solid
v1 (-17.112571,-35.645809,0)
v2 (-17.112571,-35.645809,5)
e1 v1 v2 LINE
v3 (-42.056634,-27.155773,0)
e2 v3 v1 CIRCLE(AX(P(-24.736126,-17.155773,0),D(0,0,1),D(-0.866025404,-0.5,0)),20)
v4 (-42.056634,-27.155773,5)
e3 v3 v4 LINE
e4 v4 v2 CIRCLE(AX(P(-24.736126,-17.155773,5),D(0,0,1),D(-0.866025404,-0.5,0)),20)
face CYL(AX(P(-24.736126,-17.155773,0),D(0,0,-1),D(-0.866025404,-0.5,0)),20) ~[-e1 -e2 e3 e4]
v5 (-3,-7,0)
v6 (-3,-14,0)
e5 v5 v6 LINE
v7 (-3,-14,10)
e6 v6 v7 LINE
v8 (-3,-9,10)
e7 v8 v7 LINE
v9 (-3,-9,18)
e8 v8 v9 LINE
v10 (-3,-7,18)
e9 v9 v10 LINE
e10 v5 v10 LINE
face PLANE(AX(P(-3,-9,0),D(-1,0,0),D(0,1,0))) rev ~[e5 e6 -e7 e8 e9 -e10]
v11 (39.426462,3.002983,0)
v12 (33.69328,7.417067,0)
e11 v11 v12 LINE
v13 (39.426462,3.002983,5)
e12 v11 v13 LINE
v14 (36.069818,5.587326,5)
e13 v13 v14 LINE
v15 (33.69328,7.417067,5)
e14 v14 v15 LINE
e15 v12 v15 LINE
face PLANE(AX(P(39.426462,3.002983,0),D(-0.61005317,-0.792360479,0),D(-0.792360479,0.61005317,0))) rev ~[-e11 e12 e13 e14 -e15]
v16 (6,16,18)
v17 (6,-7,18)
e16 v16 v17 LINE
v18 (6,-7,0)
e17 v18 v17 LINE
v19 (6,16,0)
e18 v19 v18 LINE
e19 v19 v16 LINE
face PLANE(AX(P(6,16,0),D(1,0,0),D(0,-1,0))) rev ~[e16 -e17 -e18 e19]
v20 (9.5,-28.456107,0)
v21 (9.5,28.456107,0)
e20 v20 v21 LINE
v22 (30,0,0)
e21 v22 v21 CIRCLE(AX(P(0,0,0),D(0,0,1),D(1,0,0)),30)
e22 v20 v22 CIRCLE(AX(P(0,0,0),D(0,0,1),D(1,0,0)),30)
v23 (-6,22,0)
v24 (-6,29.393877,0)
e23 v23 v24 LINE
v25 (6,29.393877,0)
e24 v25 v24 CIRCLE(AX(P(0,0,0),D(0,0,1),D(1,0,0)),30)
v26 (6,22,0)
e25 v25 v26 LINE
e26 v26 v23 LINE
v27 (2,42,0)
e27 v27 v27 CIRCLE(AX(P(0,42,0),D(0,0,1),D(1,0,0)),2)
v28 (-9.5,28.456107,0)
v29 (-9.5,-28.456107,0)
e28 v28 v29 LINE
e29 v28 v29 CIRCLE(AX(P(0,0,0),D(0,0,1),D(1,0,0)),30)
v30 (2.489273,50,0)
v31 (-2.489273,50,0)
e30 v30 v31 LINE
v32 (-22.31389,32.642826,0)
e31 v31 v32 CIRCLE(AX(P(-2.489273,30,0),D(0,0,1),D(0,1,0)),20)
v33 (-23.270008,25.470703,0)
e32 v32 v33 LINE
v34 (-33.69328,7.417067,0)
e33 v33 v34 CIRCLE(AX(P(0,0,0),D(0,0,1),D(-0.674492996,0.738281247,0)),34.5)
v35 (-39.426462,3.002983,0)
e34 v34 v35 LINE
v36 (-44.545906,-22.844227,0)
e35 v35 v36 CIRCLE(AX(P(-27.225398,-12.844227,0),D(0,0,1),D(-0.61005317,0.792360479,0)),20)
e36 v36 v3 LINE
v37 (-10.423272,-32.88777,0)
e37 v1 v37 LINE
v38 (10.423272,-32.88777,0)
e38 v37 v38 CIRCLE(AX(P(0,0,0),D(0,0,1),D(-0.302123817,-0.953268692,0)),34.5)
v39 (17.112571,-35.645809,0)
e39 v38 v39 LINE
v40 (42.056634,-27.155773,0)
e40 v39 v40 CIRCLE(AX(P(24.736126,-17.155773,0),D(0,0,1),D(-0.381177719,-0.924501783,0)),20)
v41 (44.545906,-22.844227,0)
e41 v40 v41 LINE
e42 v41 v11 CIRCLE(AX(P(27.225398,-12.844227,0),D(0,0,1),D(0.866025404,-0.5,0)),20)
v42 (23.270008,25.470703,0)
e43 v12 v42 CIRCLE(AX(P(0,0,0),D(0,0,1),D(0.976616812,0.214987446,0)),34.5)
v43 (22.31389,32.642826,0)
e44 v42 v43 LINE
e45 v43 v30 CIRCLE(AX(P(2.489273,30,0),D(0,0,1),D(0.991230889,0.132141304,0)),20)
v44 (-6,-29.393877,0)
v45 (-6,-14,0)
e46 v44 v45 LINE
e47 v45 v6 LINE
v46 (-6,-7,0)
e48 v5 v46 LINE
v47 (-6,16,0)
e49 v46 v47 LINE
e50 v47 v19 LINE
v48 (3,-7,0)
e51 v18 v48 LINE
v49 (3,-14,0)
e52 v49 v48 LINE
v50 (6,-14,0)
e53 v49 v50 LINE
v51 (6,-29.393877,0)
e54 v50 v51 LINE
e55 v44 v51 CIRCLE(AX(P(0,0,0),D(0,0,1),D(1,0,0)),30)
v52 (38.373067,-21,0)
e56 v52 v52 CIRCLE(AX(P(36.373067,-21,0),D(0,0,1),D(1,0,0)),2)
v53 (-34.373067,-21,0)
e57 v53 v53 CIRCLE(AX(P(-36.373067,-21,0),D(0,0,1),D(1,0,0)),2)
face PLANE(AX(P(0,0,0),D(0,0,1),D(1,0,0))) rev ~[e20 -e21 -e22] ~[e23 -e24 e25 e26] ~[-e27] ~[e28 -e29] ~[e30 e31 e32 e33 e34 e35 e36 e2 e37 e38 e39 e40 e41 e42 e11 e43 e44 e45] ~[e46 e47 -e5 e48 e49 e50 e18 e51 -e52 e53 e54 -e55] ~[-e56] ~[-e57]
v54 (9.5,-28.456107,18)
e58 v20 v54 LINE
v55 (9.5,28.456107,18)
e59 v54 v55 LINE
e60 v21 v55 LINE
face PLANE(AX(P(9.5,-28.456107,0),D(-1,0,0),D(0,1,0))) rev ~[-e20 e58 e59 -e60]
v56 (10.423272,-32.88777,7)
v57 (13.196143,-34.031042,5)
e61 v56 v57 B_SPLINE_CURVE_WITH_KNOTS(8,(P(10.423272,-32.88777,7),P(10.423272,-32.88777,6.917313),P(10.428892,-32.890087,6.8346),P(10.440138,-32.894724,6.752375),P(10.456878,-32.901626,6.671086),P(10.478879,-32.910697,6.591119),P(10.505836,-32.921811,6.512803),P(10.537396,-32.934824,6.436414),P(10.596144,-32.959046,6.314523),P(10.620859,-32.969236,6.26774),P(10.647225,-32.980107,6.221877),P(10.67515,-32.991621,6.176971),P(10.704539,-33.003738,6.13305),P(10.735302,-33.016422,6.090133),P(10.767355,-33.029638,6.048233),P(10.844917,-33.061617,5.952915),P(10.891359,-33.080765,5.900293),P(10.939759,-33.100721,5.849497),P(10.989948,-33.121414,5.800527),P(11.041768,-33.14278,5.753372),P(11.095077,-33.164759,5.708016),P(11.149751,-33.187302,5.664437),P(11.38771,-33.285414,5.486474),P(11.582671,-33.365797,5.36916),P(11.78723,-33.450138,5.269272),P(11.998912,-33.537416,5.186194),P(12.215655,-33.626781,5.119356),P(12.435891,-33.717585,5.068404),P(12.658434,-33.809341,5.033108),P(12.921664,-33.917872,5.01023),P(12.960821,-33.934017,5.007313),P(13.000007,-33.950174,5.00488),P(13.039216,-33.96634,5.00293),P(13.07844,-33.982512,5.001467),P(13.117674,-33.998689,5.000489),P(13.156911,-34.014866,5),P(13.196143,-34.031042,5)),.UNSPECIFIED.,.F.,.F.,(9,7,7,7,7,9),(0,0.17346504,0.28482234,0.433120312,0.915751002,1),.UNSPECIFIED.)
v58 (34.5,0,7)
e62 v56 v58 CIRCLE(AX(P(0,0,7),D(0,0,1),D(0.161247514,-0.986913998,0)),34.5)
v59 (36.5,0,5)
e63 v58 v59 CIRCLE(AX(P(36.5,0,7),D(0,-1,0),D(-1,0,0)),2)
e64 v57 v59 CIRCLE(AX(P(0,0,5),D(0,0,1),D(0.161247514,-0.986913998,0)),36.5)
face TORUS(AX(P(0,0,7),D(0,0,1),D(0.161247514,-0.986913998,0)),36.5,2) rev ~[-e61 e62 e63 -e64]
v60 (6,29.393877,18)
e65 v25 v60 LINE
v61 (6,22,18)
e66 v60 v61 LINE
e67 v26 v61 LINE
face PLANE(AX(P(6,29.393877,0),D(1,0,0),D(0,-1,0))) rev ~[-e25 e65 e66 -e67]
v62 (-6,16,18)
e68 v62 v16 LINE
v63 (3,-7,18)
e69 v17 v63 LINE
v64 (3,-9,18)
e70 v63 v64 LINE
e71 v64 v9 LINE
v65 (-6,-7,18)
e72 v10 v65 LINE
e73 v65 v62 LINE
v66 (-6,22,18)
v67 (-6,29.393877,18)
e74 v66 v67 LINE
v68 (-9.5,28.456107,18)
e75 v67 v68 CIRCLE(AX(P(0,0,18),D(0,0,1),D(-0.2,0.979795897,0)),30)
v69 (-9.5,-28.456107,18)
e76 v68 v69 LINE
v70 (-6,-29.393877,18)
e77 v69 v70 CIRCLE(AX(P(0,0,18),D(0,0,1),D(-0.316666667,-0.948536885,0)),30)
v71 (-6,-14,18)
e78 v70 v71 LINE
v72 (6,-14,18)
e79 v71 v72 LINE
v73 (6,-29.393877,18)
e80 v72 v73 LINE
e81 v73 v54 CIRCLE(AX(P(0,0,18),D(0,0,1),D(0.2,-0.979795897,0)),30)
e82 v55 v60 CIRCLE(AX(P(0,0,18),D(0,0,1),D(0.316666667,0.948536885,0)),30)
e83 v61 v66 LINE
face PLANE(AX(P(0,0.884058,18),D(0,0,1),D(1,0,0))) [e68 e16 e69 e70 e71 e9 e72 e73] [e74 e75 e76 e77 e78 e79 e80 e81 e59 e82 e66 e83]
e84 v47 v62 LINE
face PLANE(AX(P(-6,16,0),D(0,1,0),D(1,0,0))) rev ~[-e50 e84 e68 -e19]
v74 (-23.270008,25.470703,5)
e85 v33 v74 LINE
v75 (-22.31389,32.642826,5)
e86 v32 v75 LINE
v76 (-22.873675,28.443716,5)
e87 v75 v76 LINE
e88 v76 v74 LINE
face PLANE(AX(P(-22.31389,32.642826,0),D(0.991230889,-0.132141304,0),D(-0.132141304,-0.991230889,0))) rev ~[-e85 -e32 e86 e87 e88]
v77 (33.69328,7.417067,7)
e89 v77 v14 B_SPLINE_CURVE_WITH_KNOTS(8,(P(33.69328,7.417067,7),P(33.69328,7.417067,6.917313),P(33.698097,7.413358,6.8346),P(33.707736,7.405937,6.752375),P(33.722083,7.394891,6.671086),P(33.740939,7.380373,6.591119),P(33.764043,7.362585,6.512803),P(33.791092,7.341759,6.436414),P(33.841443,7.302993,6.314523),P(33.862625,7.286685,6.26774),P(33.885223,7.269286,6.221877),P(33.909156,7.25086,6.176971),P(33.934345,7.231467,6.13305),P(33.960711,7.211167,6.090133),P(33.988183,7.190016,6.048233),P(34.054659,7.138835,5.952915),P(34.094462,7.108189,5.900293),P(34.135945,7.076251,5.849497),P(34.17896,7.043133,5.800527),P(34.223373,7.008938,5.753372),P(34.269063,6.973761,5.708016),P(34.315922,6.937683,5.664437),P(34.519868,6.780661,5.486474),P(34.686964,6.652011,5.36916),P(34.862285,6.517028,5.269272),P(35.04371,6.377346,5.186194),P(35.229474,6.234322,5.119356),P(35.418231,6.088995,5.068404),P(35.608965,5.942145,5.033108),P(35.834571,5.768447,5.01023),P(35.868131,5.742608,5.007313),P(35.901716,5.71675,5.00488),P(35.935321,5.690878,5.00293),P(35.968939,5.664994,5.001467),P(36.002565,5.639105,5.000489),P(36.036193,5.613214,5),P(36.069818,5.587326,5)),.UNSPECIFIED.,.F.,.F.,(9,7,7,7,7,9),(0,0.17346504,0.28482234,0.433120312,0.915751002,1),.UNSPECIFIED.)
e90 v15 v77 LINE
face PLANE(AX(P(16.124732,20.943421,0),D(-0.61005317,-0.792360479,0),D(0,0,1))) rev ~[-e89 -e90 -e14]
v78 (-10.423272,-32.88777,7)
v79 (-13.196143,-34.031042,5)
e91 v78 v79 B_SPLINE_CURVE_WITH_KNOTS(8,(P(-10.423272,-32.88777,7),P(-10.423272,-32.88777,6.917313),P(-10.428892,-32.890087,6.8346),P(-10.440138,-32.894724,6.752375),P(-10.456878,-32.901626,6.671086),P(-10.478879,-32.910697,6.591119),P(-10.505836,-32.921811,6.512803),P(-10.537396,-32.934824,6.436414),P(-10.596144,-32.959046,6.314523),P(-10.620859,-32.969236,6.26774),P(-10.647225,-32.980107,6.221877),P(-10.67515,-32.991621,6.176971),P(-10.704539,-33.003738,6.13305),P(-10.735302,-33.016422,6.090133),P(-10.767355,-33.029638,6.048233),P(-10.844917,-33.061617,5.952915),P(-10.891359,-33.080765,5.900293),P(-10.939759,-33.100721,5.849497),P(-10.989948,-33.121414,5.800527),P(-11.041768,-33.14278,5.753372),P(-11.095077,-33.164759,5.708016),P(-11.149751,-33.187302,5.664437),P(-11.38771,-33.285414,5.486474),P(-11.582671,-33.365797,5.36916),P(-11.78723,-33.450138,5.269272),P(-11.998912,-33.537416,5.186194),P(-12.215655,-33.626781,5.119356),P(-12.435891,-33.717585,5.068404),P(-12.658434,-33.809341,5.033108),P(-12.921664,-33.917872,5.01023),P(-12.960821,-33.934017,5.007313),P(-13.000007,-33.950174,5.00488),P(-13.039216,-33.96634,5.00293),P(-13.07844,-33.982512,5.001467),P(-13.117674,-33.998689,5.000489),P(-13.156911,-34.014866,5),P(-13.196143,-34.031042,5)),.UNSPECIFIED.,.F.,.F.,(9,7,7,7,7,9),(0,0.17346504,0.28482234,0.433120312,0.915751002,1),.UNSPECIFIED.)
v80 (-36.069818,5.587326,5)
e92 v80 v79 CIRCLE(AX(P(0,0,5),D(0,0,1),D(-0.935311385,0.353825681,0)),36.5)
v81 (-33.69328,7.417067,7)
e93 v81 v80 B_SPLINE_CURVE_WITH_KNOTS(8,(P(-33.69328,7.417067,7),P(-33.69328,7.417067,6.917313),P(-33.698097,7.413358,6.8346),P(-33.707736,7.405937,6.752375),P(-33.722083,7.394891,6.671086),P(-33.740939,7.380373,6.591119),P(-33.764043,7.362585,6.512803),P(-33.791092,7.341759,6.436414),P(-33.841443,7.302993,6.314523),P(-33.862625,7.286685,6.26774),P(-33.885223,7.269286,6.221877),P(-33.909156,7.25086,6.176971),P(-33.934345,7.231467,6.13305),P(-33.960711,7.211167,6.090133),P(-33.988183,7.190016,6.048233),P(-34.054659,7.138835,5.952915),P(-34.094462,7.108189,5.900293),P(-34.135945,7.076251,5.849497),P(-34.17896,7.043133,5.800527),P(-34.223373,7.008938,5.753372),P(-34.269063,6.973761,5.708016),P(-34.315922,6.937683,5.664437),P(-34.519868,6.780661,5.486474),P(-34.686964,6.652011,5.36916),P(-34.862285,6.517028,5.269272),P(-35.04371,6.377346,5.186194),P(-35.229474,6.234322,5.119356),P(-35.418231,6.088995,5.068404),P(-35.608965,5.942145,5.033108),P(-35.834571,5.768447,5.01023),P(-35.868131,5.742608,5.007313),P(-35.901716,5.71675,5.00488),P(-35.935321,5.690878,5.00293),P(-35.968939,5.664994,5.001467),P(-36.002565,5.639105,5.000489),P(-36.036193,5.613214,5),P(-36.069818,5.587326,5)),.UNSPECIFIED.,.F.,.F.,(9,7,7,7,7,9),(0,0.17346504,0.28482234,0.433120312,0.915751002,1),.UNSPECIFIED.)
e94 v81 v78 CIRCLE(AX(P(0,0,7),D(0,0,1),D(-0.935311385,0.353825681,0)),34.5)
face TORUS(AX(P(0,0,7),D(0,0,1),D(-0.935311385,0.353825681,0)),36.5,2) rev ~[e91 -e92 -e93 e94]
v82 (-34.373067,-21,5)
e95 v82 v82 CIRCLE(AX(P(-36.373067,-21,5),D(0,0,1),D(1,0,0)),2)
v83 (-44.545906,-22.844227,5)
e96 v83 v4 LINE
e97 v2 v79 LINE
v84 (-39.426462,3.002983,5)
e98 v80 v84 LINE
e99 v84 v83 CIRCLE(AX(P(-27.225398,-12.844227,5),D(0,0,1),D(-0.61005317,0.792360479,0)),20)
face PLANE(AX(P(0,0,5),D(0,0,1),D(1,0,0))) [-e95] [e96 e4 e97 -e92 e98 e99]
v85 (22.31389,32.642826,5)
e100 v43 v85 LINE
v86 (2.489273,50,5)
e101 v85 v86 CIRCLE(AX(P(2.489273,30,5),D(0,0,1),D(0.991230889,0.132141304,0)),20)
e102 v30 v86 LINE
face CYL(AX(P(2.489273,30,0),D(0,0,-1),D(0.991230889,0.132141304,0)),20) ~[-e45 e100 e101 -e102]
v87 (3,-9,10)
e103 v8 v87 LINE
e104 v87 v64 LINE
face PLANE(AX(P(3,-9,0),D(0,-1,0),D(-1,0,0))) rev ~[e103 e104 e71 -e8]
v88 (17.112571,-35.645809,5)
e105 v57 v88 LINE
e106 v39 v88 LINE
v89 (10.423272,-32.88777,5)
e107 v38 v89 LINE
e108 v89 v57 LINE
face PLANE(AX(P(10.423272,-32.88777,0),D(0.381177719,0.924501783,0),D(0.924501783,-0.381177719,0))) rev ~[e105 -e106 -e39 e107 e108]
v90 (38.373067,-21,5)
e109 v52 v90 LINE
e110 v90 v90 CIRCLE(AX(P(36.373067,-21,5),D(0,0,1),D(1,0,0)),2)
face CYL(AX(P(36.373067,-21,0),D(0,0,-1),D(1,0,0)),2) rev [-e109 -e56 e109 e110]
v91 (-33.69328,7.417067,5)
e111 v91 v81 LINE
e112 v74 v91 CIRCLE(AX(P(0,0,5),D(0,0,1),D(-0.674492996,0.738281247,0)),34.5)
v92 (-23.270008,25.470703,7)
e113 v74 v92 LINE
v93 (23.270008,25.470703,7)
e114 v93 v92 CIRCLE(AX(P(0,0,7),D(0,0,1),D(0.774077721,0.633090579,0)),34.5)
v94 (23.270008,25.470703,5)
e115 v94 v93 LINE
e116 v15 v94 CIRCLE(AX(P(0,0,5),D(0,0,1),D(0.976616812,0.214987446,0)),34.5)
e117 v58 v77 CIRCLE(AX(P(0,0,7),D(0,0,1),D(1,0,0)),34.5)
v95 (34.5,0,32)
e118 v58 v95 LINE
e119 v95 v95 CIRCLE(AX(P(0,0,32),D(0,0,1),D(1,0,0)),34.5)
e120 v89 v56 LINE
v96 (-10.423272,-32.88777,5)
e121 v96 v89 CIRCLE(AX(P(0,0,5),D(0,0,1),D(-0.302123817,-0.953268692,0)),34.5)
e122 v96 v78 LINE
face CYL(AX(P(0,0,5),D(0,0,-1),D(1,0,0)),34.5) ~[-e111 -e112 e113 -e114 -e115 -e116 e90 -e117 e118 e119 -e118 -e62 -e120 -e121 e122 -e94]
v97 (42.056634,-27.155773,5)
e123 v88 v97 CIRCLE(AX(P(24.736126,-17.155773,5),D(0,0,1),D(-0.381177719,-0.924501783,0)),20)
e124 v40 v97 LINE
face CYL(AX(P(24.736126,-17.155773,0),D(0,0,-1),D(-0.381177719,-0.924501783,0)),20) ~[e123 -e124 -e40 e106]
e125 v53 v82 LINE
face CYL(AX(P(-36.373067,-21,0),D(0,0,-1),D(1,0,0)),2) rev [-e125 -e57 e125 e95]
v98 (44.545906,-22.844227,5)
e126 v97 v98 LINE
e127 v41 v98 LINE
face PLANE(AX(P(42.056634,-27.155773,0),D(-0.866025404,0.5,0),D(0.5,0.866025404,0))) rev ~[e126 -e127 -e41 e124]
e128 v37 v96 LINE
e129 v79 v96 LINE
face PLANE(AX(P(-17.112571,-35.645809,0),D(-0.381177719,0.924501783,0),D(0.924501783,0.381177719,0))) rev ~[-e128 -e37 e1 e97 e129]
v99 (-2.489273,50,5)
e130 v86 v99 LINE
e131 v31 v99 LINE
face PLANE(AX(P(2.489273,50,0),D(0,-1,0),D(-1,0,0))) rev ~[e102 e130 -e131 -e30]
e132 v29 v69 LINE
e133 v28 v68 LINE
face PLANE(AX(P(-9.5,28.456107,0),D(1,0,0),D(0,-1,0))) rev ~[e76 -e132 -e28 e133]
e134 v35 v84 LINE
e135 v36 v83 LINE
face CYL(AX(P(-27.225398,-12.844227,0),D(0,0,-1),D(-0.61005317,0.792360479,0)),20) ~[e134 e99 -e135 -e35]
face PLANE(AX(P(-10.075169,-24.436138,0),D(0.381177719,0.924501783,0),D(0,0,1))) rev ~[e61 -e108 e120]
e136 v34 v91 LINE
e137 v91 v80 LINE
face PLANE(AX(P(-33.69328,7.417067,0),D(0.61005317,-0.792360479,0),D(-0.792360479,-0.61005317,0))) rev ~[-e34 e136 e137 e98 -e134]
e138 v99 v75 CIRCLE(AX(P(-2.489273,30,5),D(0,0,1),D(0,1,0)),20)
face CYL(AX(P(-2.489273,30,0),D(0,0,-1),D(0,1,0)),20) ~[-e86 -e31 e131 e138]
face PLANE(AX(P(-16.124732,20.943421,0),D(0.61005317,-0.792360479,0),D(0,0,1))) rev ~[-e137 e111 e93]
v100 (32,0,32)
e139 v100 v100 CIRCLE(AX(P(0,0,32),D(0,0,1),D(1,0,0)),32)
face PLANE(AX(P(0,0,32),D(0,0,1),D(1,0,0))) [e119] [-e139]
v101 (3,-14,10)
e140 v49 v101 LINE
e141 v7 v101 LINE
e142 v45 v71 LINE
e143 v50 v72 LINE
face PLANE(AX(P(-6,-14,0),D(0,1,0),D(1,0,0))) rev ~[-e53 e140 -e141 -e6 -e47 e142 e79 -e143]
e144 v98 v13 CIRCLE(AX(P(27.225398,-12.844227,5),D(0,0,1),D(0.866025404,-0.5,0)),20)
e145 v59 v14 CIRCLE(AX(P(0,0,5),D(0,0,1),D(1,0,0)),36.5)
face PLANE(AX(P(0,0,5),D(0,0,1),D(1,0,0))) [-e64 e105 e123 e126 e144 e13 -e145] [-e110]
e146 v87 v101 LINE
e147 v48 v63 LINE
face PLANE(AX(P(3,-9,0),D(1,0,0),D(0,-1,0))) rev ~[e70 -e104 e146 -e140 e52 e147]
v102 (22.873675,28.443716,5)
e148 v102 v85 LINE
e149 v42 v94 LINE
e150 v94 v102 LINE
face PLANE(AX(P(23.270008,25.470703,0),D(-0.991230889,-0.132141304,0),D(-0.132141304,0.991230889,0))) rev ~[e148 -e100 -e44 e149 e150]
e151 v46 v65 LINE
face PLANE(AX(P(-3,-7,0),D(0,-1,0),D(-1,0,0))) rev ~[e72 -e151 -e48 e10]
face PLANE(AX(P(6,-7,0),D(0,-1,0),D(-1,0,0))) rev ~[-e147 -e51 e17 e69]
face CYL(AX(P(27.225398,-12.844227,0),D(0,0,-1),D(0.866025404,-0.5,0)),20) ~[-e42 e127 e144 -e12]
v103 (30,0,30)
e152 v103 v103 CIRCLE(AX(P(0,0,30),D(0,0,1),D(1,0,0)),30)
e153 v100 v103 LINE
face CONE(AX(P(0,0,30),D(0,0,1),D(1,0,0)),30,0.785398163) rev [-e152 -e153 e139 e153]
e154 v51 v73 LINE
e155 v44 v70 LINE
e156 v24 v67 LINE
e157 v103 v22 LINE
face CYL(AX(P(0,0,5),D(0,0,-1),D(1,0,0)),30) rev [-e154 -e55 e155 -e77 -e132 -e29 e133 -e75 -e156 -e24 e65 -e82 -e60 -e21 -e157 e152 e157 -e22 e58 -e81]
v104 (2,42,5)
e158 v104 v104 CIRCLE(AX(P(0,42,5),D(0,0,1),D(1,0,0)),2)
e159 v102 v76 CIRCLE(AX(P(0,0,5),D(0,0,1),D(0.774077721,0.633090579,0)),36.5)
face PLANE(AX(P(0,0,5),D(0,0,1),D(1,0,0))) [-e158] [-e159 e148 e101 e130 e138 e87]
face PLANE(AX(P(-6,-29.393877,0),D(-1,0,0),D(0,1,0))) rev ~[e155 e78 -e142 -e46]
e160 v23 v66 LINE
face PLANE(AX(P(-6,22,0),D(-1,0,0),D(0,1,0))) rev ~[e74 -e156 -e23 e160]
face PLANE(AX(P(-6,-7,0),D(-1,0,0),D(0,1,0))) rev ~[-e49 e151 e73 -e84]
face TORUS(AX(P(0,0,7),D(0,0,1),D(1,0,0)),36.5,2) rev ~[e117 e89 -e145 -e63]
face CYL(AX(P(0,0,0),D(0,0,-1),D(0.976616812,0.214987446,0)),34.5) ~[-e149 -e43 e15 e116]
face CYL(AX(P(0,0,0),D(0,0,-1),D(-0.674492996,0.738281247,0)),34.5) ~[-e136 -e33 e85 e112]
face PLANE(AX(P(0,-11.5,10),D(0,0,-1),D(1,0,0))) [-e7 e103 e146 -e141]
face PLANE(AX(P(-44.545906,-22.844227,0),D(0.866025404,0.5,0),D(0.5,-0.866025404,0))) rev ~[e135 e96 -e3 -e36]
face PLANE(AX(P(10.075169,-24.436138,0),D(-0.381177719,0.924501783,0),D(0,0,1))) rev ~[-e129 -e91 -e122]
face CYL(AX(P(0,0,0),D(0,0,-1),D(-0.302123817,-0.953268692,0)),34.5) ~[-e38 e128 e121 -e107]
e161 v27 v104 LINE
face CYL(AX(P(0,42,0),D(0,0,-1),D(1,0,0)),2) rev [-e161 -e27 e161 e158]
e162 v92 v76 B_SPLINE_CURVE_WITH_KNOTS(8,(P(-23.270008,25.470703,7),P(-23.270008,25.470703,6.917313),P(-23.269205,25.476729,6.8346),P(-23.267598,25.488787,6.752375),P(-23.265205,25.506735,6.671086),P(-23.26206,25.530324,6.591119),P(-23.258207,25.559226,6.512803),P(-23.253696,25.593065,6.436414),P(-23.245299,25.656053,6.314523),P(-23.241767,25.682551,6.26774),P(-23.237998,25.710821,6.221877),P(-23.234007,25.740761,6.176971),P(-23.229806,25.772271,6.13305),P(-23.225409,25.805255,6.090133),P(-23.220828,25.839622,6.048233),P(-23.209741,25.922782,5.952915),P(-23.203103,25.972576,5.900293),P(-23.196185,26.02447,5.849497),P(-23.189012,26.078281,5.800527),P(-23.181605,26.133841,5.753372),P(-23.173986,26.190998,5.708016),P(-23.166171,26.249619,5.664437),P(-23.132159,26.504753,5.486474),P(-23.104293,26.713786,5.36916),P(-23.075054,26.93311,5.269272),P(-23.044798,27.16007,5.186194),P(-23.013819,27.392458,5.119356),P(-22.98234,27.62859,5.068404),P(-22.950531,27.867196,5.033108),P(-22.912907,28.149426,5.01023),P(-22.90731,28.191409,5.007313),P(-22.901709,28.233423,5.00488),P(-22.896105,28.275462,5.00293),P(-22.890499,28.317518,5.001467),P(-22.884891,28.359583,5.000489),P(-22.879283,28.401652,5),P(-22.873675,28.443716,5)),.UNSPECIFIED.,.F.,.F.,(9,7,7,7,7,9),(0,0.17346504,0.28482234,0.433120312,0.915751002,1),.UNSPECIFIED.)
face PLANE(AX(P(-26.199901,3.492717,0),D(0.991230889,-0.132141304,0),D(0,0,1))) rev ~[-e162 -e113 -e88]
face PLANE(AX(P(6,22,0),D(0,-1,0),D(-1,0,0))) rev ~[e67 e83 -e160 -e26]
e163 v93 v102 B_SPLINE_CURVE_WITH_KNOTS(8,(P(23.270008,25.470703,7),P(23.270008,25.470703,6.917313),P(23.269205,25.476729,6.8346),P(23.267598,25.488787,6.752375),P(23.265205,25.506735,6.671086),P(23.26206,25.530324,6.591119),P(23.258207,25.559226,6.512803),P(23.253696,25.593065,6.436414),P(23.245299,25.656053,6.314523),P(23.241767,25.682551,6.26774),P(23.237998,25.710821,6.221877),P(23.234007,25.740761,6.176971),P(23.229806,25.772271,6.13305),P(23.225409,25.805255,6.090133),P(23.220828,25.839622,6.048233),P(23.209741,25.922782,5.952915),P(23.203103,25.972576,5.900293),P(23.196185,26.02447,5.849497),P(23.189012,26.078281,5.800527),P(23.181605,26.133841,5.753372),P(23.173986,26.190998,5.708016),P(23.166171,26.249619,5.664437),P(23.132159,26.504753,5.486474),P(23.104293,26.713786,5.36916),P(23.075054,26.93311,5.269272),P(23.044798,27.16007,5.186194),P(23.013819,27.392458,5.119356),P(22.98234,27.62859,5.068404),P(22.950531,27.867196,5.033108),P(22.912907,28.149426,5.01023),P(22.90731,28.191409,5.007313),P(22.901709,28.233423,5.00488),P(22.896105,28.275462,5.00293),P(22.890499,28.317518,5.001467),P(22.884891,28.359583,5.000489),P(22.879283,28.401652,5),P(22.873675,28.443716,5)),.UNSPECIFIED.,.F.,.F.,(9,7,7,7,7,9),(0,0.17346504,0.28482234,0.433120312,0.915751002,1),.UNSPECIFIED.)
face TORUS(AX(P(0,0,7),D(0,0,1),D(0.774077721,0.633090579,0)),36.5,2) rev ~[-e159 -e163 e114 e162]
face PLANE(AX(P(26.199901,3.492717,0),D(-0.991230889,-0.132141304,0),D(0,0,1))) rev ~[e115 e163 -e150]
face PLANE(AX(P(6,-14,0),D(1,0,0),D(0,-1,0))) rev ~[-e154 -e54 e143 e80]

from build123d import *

# Parameters (mm, degrees)
F0_R         = 2
F0_R_2       = 30
F1_DEPTH     = 5
F2_R         = 34.5
F2_R_2       = 30
F3_DEPTH     = 27
F5_DEPTH     = 18
F6_SIZE      = 2
F7_T4_ANGLE  = 101.4429805126
F7_T10_ANGLE = 101.4429805126
F7_T16_ANGLE = 20.718590379
F7_T21_ANGLE = 80.7206862136
F8_W         = 6
F8_H         = 5
F9_DEPTH     = 10


# Not quite as in the source:
# - a fillet or chamfer that OpenCascade refuses, or shapes differently, is made with other operations: its cross-section is extruded or revolved along the edge and cut away or added


with BuildPart() as f1:
    # F0 (on Top) → F1 (new body)
    with BuildSketch(Plane.XY):
        with BuildLine():
            Line((2.4892725641, 50), (-2.4892725641, 50))
            ThreePointArc((-2.4892725641, 50), (-15.663935341, 45.0475333764), (-22.31389035, 32.6428260715))
            Line((-22.31389035, 32.6428260715), (-23.2700083459, 25.4707030052))
            ThreePointArc((-23.2700083459, 25.4707030052), (-29.8778764306, 17.25), (-33.6932800277, 7.4170668712))
            Line((-33.6932800277, 7.4170668712), (-39.4264618042, 3.0029828646))
            ThreePointArc((-39.4264618042, 3.0029828646), (-46.8442759523, -8.9584007597), (-44.5459064713, -22.8442267226))
            Line((-44.5459064713, -22.8442267226), (-42.0566339072, -27.1557732774))
            ThreePointArc((-42.0566339072, -27.1557732774), (-31.1803406113, -36.0891326167), (-17.1125714543, -35.6458089361))
            Line((-17.1125714543, -35.6458089361), (-10.4232716818, -32.8877698765))
            ThreePointArc((-10.4232716818, -32.8877698765), (0, -34.5), (10.4232716818, -32.8877698765))
            Line((10.4232716818, -32.8877698765), (17.1125714543, -35.6458089361))
            ThreePointArc((17.1125714543, -35.6458089361), (31.1803406113, -36.0891326167), (42.0566339072, -27.1557732774))
            Line((42.0566339072, -27.1557732774), (44.5459064713, -22.8442267226))
            ThreePointArc((44.5459064713, -22.8442267226), (46.8442759523, -8.9584007597), (39.4264618042, 3.0029828646))
            Line((39.4264618042, 3.0029828646), (33.6932800277, 7.4170668712))
            ThreePointArc((33.6932800277, 7.4170668712), (29.8778764306, 17.25), (23.2700083459, 25.4707030052))
            Line((23.2700083459, 25.4707030052), (22.31389035, 32.6428260715))
            ThreePointArc((22.31389035, 32.6428260715), (15.663935341, 45.0475333764), (2.4892725641, 50))
        make_face()
        with Locations((-36.3730669589, -21)):
            Circle(F0_R, mode=Mode.SUBTRACT)
        with Locations((36.3730669589, -21)):
            Circle(F0_R, mode=Mode.SUBTRACT)
        Circle(F0_R_2, mode=Mode.SUBTRACT)
        with Locations((0, 42)):
            Circle(F0_R, mode=Mode.SUBTRACT)
    extrude(amount=F1_DEPTH)

    # F2 (on face) → F3 (join)
    with BuildSketch(Plane.XY.offset(5)):
        Circle(F2_R)
        Circle(F2_R_2, mode=Mode.SUBTRACT)
    extrude(amount=F3_DEPTH)

    # F4 (on Top) → F5 (join)
    with BuildSketch(Plane.XY):
        with BuildLine():
            Line((9.5, 0), (9.5, 28.4561065503))
            ThreePointArc((9.5, 28.4561065503), (7.7641711286, 28.9778820255), (6, 29.3938769134))
            Line((6, 29.3938769134), (6, 22))
            Line((6, 22), (0, 22))
            Line((0, 22), (-6, 22))
            Line((-6, 22), (-6, 29.3938769134))
            ThreePointArc((-6, 29.3938769134), (-7.7641711286, 28.9778820255), (-9.5, 28.4561065503))
            Line((-9.5, 28.4561065503), (-9.5, 0))
            Line((-9.5, 0), (-9.5, -28.4561065503))
            ThreePointArc((-9.5, -28.4561065503), (-7.7641711286, -28.9778820255), (-6, -29.3938769134))
            Line((-6, -29.3938769134), (-6, -14))
            Line((-6, -14), (-6, -9))
            Line((-6, -9), (-6, -7))
            Line((-6, -7), (-6, 16))
            Line((-6, 16), (0, 16))
            Line((0, 16), (6, 16))
            Line((6, 16), (6, -7))
            Line((6, -7), (6, -9))
            Line((6, -9), (6, -14))
            Line((6, -14), (6, -29.3938769134))
            ThreePointArc((6, -29.3938769134), (7.7641711286, -28.9778820255), (9.5, -28.4561065503))
            Line((9.5, -28.4561065503), (9.5, 0))
        make_face()
        Polygon((0, -14), (6, -14), (6, -9), (6, -7), (3, -7), (3, -9), (-3, -9), (-3, -7), (-6, -7), (-6, -9), (-6, -14), align=None)
    extrude(amount=F5_DEPTH)

    # F6
    f6_edges = [f1.edges().sort_by_distance(p)[0] for p in [
        (-30, 0, 32),
    ]]
    chamfer(f6_edges, length=F6_SIZE)

    # F7: fillet of radius 2 on 3 edges, made by hand


with BuildPart() as f7_tool2:
    # F7_s3 → F7_t4 (revolve)
    with BuildSketch(Plane(origin=(0, 0, 0), x_dir=(0, 0, 1), z_dir=(0.3538256813, 0.9353113852, 0))):
        with BuildLine():
            ThreePointArc((7, -34.5), (5.5857864376, -35.0857864376), (5, -36.5))
            Line((5, -36.5), (5, -34.5))
            Line((5, -34.5), (7, -34.5))
        make_face()
    revolve(axis=Axis((0, 0, 5), (0, 0, 1)), revolution_arc=F7_T4_ANGLE)

    split(bisect_by=Plane(origin=(-16.1247319925, 20.9434209841, 0), x_dir=(0, 0, 1), z_dir=(0.6100531704, -0.7923604794, 0)), keep=Keep.TOP)

    split(bisect_by=Plane(origin=(10.0751686181, -24.4361380268, 0), x_dir=(0, 0, 1), z_dir=(-0.3811777189, 0.9245017829, 0)), keep=Keep.TOP)


with BuildPart() as f1_1:
    add(f1.part)

    # F7_t1: union F7_tool2
    add(f7_tool2.part)


with BuildPart() as f7_tool8:
    # F7_s9 → F7_t10 (revolve)
    with BuildSketch(Plane(origin=(0, 0, 0), x_dir=(0, 0, 1), z_dir=(0.6330905794, -0.7740777211, 0))):
        with BuildLine():
            ThreePointArc((7, -34.5), (5.5857864376, -35.0857864376), (5, -36.5))
            Line((5, -36.5), (5, -34.5))
            Line((5, -34.5), (7, -34.5))
        make_face()
    revolve(axis=Axis((0, 0, 5), (0, 0, 1)), revolution_arc=F7_T10_ANGLE)

    split(bisect_by=Plane(origin=(-26.1999006106, 3.4927170427, 0), x_dir=(0, 0, 1), z_dir=(0.9912308893, -0.1321413036, 0)), keep=Keep.TOP)

    split(bisect_by=Plane(origin=(26.1999006106, 3.4927170427, 0), x_dir=(0, 0, 1), z_dir=(-0.9912308893, -0.1321413036, 0)), keep=Keep.TOP)


with BuildPart() as f1_2:
    add(f1_1.part)

    # F7_t7: union F7_tool8
    add(f7_tool8.part)


with BuildPart() as f7_tool14:
    # F7_s15 → F7_t16 (revolve)
    with BuildSketch(Plane.XZ):
        with BuildLine():
            ThreePointArc((34.5, 7), (35.0857864376, 5.5857864376), (36.5, 5))
            Line((36.5, 5), (34.5, 5))
            Line((34.5, 5), (34.5, 7))
        make_face()
    revolve(axis=Axis((0, 0, 5), (0, 0, 1)), revolution_arc=F7_T16_ANGLE)

    split(bisect_by=Plane(origin=(16.1247319925, 20.9434209841, 0), x_dir=(0, 0, 1), z_dir=(-0.6100531704, -0.7923604794, 0)), keep=Keep.TOP)


with BuildPart() as f1_3:
    add(f1_2.part)

    # F7_t13: union F7_tool14
    add(f7_tool14.part)


with BuildPart() as f7_tool19:
    # F7_s20 → F7_t21 (revolve)
    with BuildSketch(Plane(origin=(0, 0, 0), x_dir=(0, 0, 1), z_dir=(-0.9869139979, -0.1612475137, 0))):
        with BuildLine():
            ThreePointArc((7, -34.5), (5.5857864376, -35.0857864376), (5, -36.5))
            Line((5, -36.5), (5, -34.5))
            Line((5, -34.5), (7, -34.5))
        make_face()
    revolve(axis=Axis((0, 0, 5), (0, 0, 1)), revolution_arc=F7_T21_ANGLE)

    split(bisect_by=Plane(origin=(-10.0751686181, -24.4361380268, 0), x_dir=(0, 0, 1), z_dir=(0.3811777189, 0.9245017829, 0)), keep=Keep.TOP)


with BuildPart() as f1_4:
    add(f1_3.part)

    # F7_t18: union F7_tool19
    add(f7_tool19.part)

    # F8 (on face) → F9 (cut)
    with BuildSketch(Plane(origin=(0, 0, 0), x_dir=(1, 0, 0), z_dir=(0, 0, -1))):
        with Locations((0, 11.5)):
            Rectangle(F8_W, F8_H)
    extrude(amount=-F9_DEPTH, mode=Mode.SUBTRACT)


solid = f1_4.part
